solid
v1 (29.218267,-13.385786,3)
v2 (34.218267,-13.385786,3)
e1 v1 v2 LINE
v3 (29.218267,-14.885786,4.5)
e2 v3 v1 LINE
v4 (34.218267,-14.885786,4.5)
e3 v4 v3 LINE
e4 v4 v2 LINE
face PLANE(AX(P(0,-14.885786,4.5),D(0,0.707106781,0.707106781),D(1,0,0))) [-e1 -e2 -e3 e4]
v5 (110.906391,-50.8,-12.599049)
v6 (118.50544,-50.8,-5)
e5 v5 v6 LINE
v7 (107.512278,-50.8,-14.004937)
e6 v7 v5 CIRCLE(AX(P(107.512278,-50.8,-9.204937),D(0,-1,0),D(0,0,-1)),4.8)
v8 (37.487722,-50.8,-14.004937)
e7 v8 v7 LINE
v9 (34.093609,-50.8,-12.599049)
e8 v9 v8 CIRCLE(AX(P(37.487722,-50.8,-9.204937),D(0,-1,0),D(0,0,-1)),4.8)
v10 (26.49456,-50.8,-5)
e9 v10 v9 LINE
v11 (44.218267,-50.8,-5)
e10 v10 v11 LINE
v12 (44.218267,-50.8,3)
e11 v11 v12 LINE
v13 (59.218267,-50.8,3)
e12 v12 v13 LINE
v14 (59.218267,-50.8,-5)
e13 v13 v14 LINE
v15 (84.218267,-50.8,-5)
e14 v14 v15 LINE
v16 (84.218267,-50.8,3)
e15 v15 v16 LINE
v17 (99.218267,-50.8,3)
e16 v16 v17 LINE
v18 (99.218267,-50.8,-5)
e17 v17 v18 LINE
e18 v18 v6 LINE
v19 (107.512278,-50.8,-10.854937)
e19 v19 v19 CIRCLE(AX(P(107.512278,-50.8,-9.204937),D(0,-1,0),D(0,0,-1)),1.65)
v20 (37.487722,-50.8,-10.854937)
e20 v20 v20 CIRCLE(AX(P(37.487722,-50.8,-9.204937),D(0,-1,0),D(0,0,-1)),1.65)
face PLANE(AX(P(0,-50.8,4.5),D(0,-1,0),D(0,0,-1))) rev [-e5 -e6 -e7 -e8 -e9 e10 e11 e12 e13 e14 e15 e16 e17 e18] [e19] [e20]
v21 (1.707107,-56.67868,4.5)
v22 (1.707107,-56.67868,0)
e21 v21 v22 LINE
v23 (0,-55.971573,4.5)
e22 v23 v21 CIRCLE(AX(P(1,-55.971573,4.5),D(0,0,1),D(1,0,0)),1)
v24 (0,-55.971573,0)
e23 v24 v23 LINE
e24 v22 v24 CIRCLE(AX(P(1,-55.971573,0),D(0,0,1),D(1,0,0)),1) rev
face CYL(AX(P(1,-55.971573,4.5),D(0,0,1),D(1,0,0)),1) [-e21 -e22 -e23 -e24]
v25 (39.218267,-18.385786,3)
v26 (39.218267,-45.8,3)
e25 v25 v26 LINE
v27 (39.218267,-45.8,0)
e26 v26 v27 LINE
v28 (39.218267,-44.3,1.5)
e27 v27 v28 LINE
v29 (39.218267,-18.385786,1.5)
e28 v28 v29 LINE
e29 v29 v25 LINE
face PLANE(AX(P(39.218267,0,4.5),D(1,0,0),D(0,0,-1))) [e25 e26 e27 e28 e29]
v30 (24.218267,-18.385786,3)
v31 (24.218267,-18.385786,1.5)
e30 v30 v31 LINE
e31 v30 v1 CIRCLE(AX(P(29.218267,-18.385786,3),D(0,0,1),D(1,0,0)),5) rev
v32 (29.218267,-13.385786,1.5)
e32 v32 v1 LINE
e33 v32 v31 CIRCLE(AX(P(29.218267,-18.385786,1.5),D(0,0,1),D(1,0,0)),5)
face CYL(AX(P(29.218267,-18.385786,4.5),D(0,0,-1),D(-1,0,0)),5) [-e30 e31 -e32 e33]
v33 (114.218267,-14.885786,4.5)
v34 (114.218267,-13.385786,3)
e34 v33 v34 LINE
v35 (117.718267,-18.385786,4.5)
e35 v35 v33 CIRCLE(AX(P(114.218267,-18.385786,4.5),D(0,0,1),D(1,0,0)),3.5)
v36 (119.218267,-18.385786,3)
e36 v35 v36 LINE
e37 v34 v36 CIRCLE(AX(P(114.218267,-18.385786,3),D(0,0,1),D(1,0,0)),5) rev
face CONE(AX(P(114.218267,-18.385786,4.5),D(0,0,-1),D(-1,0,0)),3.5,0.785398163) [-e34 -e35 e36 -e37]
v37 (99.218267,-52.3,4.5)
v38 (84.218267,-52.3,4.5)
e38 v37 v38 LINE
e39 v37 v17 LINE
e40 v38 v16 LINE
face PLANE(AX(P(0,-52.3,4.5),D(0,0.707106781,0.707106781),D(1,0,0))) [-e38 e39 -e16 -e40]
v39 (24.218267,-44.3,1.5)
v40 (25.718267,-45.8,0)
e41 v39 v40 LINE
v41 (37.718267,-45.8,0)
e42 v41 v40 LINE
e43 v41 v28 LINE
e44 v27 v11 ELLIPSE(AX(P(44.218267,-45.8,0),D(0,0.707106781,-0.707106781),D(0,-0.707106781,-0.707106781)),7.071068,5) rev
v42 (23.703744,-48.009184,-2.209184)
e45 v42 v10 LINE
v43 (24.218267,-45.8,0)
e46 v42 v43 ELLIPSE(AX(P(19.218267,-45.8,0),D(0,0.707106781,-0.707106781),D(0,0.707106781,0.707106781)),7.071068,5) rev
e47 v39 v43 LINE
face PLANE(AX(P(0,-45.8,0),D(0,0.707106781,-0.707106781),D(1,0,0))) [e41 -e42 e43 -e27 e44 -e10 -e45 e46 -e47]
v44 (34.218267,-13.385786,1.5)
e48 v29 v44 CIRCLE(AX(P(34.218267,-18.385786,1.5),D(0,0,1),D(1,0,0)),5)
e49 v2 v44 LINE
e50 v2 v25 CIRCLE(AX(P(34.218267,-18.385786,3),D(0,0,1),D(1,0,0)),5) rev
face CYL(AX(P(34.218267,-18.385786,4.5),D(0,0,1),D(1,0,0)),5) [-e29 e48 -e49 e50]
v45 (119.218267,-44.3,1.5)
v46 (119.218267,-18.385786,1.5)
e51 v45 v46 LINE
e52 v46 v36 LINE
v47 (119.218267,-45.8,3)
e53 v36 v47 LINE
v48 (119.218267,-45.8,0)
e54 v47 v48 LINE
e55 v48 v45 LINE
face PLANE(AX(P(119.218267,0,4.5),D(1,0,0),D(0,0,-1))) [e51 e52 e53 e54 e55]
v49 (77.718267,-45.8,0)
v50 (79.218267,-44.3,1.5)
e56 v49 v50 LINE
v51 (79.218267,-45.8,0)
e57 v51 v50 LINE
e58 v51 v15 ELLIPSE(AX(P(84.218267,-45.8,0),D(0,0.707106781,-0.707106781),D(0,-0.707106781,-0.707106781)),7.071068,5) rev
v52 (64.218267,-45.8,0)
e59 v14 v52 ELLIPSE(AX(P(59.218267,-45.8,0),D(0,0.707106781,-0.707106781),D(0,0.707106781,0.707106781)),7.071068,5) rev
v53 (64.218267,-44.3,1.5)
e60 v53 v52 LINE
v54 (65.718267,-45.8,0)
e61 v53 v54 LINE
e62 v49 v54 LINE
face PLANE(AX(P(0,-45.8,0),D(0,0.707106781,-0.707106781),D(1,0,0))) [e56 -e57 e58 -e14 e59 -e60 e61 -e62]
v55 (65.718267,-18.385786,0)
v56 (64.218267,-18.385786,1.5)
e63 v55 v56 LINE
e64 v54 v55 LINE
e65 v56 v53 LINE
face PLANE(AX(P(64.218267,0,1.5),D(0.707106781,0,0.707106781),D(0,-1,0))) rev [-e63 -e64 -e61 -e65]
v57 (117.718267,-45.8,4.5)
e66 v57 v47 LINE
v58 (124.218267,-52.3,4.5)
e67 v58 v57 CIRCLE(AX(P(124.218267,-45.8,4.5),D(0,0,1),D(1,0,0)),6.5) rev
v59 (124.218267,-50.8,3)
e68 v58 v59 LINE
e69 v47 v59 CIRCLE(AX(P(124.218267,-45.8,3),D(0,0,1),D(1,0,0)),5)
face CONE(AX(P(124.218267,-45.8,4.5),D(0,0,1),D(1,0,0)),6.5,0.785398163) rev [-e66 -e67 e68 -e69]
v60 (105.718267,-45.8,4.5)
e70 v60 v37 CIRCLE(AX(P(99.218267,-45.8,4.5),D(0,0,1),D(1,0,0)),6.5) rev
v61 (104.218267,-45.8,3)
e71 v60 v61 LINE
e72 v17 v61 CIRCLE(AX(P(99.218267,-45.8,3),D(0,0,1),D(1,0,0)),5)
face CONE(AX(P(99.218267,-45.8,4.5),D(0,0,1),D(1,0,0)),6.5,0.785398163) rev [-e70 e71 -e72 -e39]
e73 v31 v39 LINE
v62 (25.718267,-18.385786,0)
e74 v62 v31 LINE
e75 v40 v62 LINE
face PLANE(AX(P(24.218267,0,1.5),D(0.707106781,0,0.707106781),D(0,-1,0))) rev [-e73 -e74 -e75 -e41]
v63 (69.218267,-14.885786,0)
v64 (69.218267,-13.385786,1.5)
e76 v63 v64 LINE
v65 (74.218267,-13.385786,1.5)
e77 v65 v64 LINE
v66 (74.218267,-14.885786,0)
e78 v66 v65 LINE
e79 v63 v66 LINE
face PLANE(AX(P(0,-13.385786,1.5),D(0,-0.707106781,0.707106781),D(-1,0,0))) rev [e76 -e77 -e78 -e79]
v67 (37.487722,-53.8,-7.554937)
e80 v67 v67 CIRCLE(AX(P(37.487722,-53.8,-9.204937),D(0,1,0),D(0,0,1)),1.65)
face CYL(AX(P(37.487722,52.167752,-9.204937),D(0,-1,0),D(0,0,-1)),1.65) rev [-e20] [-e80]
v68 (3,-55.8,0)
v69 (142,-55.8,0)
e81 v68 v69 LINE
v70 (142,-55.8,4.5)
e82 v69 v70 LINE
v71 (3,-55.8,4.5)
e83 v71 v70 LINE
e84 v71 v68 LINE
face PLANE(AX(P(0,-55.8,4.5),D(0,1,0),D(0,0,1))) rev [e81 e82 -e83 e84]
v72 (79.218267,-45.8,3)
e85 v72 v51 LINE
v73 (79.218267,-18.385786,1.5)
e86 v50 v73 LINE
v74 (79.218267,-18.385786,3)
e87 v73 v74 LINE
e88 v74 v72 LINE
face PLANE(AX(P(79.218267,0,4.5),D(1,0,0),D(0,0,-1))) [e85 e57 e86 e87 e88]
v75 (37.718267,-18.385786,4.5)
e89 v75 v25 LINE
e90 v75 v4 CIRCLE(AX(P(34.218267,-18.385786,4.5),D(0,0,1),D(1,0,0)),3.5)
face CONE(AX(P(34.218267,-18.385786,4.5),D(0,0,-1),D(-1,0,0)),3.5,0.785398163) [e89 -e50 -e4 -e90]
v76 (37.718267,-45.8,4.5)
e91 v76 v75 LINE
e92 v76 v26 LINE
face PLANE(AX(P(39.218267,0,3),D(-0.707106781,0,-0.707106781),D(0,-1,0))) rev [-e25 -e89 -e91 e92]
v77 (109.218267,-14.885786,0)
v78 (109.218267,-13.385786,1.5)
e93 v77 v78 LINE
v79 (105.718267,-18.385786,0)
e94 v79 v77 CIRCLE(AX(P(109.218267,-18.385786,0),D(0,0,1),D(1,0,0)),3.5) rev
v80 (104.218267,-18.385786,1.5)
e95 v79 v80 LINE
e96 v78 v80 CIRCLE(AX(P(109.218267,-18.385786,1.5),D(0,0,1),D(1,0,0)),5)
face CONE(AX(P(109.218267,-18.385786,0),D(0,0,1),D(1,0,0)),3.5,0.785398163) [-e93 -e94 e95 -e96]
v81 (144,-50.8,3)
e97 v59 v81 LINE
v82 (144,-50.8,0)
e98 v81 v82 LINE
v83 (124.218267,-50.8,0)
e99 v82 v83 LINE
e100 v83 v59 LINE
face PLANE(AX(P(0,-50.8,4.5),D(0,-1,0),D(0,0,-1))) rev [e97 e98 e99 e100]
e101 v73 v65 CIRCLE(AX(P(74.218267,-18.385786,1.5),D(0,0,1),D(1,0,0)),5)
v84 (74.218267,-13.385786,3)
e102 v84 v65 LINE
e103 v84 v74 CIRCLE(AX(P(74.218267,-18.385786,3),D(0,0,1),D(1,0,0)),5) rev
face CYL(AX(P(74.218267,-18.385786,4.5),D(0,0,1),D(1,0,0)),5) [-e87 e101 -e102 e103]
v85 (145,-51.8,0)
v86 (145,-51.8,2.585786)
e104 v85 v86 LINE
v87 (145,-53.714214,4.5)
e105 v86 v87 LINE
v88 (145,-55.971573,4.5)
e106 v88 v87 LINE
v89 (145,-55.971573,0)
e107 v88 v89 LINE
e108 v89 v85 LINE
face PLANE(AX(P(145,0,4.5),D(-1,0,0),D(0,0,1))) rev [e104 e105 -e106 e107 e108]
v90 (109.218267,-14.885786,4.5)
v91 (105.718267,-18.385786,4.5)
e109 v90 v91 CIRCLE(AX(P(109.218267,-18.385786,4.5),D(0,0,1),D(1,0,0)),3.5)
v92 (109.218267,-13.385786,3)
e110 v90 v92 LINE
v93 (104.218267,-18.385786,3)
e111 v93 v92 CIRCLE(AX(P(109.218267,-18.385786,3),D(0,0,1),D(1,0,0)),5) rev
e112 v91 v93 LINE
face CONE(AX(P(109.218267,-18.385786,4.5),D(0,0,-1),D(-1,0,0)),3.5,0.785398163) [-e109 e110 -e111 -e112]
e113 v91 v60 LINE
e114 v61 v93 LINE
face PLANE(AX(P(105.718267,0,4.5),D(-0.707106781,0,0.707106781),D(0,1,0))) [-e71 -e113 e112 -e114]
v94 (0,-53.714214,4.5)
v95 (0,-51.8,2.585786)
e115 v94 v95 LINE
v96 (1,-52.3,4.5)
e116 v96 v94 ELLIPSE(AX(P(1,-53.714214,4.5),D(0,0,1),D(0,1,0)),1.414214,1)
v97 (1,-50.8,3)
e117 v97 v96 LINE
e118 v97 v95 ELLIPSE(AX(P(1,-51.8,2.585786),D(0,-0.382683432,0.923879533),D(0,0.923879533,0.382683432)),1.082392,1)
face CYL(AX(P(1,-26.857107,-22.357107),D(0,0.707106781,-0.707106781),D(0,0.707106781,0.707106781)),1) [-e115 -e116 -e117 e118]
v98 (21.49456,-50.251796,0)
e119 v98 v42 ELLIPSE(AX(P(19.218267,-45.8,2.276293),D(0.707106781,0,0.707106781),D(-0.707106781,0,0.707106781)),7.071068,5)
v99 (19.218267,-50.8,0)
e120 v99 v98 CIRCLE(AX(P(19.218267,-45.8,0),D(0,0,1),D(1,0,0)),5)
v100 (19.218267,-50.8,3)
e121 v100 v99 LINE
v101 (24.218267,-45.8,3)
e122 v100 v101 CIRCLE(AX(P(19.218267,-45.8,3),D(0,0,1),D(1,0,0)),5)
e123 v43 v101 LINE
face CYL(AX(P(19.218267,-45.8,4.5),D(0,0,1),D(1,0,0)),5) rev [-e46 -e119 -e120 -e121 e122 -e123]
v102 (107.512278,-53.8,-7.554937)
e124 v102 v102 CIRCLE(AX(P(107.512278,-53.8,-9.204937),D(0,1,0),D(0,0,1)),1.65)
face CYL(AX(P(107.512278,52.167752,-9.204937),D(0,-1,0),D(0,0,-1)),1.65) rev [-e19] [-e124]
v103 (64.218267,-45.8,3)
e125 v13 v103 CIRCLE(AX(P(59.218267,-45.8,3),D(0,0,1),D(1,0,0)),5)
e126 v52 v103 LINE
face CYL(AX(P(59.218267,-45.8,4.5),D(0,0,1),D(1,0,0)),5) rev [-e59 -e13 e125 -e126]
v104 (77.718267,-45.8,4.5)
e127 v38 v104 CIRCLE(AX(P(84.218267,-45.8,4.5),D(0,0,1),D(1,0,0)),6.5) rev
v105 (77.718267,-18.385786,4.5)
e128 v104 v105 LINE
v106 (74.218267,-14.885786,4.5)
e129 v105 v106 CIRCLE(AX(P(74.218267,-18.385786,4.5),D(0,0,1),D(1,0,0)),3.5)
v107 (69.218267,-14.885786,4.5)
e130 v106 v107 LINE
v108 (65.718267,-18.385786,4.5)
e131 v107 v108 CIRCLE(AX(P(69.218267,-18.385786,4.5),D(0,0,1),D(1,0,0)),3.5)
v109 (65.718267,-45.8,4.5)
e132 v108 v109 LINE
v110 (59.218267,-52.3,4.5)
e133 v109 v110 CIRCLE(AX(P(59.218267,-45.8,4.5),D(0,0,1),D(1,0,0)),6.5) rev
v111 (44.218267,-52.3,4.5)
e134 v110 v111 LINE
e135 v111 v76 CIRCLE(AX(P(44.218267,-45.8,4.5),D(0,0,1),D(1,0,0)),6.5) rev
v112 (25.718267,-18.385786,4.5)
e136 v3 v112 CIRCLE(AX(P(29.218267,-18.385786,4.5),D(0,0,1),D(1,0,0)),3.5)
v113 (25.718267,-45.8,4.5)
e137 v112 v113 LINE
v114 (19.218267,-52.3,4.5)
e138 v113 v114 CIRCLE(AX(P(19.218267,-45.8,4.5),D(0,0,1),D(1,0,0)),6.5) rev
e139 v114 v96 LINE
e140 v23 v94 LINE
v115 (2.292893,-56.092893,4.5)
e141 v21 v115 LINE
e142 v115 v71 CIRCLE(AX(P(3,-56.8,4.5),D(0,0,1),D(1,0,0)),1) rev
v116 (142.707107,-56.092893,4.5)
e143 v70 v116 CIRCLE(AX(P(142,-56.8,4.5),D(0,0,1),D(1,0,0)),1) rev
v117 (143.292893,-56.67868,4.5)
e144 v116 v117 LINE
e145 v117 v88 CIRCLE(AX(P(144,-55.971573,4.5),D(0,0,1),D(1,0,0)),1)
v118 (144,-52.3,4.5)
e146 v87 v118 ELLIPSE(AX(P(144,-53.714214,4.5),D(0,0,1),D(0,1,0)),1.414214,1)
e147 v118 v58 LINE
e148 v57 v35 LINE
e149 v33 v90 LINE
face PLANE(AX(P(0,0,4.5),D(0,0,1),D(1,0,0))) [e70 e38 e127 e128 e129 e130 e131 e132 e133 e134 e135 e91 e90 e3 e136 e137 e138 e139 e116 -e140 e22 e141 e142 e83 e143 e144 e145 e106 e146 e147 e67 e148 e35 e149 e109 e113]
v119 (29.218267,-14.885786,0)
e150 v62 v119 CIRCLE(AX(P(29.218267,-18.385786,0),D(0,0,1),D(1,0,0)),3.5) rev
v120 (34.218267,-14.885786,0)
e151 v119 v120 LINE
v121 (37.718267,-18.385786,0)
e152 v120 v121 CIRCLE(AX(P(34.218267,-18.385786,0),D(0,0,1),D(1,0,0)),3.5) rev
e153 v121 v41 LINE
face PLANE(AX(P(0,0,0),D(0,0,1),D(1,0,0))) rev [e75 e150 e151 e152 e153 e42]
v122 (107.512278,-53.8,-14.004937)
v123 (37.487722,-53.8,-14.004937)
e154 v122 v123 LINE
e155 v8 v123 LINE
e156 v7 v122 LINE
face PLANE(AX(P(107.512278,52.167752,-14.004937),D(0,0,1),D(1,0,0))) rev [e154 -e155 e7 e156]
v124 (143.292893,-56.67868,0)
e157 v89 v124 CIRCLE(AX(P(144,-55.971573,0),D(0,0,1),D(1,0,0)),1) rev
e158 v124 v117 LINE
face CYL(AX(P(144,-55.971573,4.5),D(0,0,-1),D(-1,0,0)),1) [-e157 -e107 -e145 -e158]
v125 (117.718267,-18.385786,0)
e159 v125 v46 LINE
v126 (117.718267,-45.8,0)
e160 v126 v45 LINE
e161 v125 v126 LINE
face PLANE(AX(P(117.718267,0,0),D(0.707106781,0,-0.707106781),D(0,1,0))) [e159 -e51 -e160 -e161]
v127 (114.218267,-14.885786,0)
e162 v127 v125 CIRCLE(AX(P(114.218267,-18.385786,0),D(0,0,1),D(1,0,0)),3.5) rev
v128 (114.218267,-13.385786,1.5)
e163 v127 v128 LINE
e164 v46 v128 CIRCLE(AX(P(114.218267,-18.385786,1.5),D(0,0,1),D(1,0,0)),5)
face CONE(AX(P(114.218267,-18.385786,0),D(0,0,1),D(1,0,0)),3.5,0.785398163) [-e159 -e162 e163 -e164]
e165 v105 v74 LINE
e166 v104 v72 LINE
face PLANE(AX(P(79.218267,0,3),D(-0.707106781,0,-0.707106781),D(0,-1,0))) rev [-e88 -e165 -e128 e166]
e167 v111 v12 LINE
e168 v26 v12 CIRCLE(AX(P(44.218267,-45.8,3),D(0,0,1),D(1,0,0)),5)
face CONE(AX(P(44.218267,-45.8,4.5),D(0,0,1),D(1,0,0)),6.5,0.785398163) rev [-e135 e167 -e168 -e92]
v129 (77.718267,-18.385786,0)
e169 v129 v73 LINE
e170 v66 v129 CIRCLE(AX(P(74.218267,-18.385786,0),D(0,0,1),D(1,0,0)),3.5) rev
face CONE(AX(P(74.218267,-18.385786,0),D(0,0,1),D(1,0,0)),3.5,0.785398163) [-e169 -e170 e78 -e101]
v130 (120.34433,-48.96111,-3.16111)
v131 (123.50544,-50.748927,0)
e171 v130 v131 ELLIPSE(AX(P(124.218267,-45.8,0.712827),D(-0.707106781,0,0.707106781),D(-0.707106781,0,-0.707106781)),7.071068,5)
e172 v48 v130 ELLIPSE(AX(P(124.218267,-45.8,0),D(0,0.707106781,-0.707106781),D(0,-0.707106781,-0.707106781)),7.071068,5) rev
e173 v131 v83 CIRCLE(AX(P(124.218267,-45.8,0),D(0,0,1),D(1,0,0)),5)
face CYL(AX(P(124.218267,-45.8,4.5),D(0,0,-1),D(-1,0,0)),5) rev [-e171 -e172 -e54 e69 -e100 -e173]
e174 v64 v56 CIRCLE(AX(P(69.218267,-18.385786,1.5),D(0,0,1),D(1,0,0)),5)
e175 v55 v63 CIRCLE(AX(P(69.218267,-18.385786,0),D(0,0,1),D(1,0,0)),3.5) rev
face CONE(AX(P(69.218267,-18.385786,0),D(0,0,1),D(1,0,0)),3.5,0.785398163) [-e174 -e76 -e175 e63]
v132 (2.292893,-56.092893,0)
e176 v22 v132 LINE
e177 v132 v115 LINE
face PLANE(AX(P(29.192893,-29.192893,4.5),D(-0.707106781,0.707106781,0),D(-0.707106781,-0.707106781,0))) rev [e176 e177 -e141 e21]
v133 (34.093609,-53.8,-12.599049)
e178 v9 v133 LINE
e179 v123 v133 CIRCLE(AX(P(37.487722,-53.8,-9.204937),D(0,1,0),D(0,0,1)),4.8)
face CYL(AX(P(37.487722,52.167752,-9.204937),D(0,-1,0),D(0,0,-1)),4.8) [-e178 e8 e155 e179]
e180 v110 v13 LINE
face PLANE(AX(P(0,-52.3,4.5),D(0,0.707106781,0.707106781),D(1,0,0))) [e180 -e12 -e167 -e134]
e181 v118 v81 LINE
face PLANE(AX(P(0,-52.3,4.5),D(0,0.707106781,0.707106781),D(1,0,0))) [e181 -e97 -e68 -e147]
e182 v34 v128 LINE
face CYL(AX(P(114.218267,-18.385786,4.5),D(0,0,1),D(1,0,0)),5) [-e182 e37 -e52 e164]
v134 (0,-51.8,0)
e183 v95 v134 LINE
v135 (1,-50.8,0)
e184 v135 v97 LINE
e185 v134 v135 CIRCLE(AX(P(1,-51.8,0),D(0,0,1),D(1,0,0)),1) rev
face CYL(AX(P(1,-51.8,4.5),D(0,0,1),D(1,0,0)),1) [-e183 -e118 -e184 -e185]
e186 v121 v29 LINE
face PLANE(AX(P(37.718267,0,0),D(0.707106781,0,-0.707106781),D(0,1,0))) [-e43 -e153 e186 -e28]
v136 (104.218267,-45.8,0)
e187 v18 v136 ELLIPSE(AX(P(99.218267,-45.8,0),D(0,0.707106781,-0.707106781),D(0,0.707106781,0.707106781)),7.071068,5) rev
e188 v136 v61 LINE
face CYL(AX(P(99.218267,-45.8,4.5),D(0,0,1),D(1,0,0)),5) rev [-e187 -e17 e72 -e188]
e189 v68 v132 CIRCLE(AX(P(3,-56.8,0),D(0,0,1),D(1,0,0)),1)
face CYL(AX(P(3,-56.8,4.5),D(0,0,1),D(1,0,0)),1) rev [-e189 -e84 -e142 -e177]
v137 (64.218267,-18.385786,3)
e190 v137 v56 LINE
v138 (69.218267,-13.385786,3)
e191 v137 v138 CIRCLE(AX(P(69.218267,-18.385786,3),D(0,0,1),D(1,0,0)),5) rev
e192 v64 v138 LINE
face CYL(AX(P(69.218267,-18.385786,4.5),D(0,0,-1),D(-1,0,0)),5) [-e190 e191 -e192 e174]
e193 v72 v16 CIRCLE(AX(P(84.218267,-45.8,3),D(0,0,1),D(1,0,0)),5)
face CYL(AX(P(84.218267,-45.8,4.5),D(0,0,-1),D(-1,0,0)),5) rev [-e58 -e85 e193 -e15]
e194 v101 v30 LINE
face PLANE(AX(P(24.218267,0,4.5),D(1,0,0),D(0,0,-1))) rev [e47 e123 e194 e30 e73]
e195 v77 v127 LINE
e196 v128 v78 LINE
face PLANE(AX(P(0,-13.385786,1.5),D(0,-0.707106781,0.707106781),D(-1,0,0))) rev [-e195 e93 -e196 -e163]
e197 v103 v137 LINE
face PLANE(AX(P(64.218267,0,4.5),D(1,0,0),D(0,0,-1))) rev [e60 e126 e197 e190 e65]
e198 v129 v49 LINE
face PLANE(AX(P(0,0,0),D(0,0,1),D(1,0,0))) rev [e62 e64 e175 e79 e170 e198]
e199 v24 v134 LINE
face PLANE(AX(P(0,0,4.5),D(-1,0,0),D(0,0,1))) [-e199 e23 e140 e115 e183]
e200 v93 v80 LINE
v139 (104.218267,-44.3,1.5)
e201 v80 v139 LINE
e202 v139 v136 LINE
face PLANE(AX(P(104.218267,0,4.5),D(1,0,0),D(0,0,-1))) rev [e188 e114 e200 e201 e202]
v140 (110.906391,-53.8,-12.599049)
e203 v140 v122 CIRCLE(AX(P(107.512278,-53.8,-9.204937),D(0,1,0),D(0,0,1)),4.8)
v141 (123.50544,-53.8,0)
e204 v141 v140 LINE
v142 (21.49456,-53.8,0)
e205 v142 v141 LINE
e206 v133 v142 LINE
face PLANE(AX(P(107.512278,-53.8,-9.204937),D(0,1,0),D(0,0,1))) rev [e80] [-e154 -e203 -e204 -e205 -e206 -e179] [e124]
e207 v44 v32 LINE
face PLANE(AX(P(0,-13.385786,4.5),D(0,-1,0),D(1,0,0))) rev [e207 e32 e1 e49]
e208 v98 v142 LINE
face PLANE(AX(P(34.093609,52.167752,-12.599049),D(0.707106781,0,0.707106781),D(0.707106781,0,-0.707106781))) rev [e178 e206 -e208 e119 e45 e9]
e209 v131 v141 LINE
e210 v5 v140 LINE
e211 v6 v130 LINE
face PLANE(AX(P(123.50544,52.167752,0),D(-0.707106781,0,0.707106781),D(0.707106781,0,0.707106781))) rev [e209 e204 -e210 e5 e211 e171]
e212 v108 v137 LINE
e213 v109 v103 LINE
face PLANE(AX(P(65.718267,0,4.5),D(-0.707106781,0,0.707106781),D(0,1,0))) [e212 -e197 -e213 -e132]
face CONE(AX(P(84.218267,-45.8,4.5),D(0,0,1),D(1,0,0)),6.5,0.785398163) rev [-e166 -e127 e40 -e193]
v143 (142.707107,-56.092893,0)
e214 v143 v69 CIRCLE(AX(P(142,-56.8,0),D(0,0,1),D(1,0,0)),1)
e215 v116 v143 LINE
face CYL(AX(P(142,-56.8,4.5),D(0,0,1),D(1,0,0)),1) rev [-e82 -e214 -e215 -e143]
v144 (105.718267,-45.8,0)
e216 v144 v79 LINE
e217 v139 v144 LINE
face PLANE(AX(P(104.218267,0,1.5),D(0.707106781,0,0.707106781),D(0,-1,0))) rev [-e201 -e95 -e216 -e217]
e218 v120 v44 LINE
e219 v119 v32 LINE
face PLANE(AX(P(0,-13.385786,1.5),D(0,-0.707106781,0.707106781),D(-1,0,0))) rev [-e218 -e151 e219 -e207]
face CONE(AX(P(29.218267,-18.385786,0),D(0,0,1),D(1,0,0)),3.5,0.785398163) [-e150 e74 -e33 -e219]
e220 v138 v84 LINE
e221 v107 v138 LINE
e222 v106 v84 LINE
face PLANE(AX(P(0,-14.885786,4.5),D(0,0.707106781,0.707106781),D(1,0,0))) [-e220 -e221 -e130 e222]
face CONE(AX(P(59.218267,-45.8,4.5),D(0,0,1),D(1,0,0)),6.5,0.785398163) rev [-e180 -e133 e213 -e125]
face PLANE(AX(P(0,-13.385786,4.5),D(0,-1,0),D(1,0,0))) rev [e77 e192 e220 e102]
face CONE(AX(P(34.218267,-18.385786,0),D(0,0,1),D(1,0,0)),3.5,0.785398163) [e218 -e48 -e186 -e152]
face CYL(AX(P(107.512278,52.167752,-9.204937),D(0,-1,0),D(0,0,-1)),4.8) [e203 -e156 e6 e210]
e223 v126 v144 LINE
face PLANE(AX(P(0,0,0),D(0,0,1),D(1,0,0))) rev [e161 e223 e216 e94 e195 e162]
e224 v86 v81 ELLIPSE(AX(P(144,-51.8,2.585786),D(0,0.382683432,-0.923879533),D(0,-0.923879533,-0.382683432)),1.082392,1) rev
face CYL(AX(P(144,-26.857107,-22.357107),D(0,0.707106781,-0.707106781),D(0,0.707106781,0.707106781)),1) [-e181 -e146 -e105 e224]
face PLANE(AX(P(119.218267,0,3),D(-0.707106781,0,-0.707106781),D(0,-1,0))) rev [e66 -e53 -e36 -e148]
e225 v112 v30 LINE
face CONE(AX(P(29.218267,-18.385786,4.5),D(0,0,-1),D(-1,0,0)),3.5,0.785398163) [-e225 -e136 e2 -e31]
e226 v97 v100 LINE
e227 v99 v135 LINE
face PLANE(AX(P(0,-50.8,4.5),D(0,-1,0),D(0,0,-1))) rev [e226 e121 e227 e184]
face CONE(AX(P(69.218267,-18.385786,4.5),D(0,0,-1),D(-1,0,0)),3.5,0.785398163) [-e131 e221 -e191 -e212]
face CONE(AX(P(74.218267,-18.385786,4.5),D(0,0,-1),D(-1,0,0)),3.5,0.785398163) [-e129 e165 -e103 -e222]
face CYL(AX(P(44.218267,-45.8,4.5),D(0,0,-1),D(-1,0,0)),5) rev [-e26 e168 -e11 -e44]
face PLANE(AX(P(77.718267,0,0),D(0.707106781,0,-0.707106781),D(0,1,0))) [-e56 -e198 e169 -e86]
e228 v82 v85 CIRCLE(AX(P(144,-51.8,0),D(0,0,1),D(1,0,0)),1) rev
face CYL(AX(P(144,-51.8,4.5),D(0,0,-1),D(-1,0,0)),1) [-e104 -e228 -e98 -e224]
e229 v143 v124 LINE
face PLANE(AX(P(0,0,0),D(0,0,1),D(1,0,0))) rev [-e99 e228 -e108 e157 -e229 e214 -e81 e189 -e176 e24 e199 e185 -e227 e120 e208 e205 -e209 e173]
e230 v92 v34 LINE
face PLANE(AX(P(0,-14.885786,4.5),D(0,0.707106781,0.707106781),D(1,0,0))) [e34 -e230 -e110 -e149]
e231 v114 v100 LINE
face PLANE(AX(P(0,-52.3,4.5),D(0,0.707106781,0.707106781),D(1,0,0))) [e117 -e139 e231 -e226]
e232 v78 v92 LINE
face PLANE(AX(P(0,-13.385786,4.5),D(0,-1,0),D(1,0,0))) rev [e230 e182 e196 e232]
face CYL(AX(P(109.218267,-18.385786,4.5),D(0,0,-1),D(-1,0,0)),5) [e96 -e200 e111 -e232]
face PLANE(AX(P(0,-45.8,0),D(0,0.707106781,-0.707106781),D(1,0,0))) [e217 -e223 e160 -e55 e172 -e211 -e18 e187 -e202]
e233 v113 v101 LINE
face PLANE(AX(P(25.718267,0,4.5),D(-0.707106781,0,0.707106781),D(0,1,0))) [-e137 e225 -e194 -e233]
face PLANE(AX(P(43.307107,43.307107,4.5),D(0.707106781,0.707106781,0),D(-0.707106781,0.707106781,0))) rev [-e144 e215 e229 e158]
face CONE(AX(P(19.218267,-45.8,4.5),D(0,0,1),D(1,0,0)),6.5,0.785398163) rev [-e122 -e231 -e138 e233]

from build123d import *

# Parameters (mm, degrees)
BOSS_EXTRUDE1_DEPTH = 4.5
SKETCH2_R           = 1.6500000000000021
BOSS_EXTRUDE2_DEPTH = 3
CHAMFER1_SIZE       = 5
FILLET1_R           = 5
FILLET2_R           = 5
CHAMFER2_SIZE       = 1.5
CHAMFER3_SIZE       = 1.5
FILLET3_R           = 1


with BuildPart() as part:
    # Sketch1 → Boss-Extrude1 (new body)
    with BuildSketch(Plane.XY):
        Polygon((119.21826692136499, -13.385786437626857), (104.21826692136499, -13.38578643762686), (104.21826692136499, -50.8), (79.218266921365, -50.8), (79.218266921365, -13.385786437626857), (64.218266921365, -13.38578643762686), (64.218266921365, -50.8), (39.218266921365, -50.8), (39.21826692136499, -13.385786437627136), (24.218266921364993, -13.38578643762714), (24.21826692136499, -50.8), (0, -50.79999999999999), (0, -58.38578643762687), (2.5857864376269135, -55.8), (142.4142135623731, -55.8), (145, -58.38578643762691), (145, -50.8), (119.21826692136499, -50.8), align=None)
    extrude(amount=BOSS_EXTRUDE1_DEPTH)

    # Sketch2 → Boss-Extrude2 (add)
    with BuildSketch(Plane(origin=(0, -53.8, 0), x_dir=(1, 0, 0), z_dir=(0, 1, 0))):
        with BuildLine():
            Line((123.50544023729859, 2.968e-14), (110.90639087969068, 12.59904935760797))
            ThreePointArc((110.90639087969068, 12.59904935760797), (109.34915880534766, 13.639558563966734), (107.5122783299952, 14.004936807912568))
            Line((107.5122783299952, 14.004936807912568), (37.48772167000479, 14.004936807912571))
            ThreePointArc((37.48772167000479, 14.004936807912571), (35.65084119465232, 13.639558563966755), (34.093609120309296, 12.599049357607985))
            Line((34.093609120309296, 12.599049357607985), (21.4945597627013, -1.69e-15))
            Line((21.4945597627013, -1.69e-15), (123.50544023729859, 2.968e-14))
        make_face()
        with Locations(Location((37.48772167000473, 9.204936807912581, 0), (0, 0, 90))):
            Circle(SKETCH2_R, mode=Mode.SUBTRACT)
        with Locations(Location((107.51227832999525, 9.204936807912581, 0), (0, 0, 90))):
            Circle(SKETCH2_R, mode=Mode.SUBTRACT)
    extrude(amount=BOSS_EXTRUDE2_DEPTH)

    # Chamfer1
    # the kernel refuses this chamfer: 5 mm, written as the material it adds along each edge
    with BuildSketch(Plane(origin=(24.218266921364993, -50.8, 8.6e-16), x_dir=(0, -0.02749587661059184, -0.9996219169112965), z_dir=(1, 0, -3.1e-16))) as chamfer1_piece_1_section:
        Polygon((CHAMFER1_SIZE * 0.999621916911, CHAMFER1_SIZE * 0.0274958766106), (-CHAMFER1_SIZE * 0.0274958766106, CHAMFER1_SIZE * 0.999621916911), (0, 0), align=None)
    chamfer1_piece_1 = extrude(amount=15.000000000000007, mode=Mode.PRIVATE)
    chamfer1_piece_1 = split(chamfer1_piece_1, bisect_by=Plane(origin=(27.458586857581327, -49.136179349739656, -5.964027094880023), z_dir=(0.7071067811865472, 0, 0.7071067811865478)), keep=Keep.TOP, mode=Mode.PRIVATE)
    add(chamfer1_piece_1)
    with BuildSketch(Plane(origin=(64.218266921365, -50.8, -1.145e-14), x_dir=(0, -0.02749587661058908, -0.9996219169112968), z_dir=(1, 0, -3.1e-16))) as chamfer1_piece_2:
        Polygon((CHAMFER1_SIZE * 0.999621916911, CHAMFER1_SIZE * 0.0274958766106), (-CHAMFER1_SIZE * 0.0274958766106, CHAMFER1_SIZE * 0.999621916911), (0, 0), align=None)
    extrude(amount=15)
    with BuildSketch(Plane(origin=(104.21826692136499, -50.8, -2.375e-14), x_dir=(0, 0.9996219169112965, 0.027495876610591035), z_dir=(1, 0, -3.1e-16))) as chamfer1_piece_3_section:
        Polygon((CHAMFER1_SIZE * 0.999621916911, -CHAMFER1_SIZE * 0.0274958766106), (-CHAMFER1_SIZE * 0.0274958766106, -CHAMFER1_SIZE * 0.999621916911), (0, 0), align=None)
    chamfer1_piece_3 = extrude(amount=15, mode=Mode.PRIVATE)
    chamfer1_piece_3 = split(chamfer1_piece_3, bisect_by=Plane(origin=(116.78603436653776, -49.14998540496001, -6.719405870760873), z_dir=(-0.7071067811865483, 0, 0.7071067811865467)), keep=Keep.TOP, mode=Mode.PRIVATE)
    add(chamfer1_piece_3)

    # Fillet1
    fillet1_edges = [part.edges().sort_by_distance(p)[0] for p in [
        (39.218266921365, -50.80000000000099, -0.24999999999926015),
        (64.218266921365, -50.80000000000099, -0.24999999999926015),
        (79.218266921365, -50.80000000000099, -0.24999999999926015),
        (104.218266921365, -50.799999999999, -0.24999999999926015),
        (119.21826692136499, -50.799999999999145, 0.10641334203299913),
        (24.218266921364997, -50.80000000000054, 0.8881464206679999),
    ]]
    fillet(fillet1_edges, radius=FILLET1_R)

    # Fillet2
    fillet2_edges = [part.edges().sort_by_distance(p)[0] for p in [
        (24.218266921364993, -13.38578643762714, 2.25),
        (39.21826692136499, -13.385786437627136, 2.25),
        (64.218266921365, -13.38578643762686, 2.25),
        (79.218266921365, -13.385786437626857, 2.25),
        (104.21826692136499, -13.38578643762686, 2.25),
        (119.21826692136499, -13.385786437626855, 2.25),
    ]]
    fillet(fillet2_edges, radius=FILLET2_R)

    # Chamfer2
    # the kernel refuses this chamfer: 1.5 mm, written as the material it takes off along each edge
    with BuildSketch(Plane(origin=(114.218266921365, -13.385786437626859, 0), x_dir=(0, -0.9996219169112968, -0.02749587661058636), z_dir=(-1, -2.4e-16, 0))) as chamfer2_piece_1:
        Polygon((CHAMFER2_SIZE * 0.999621916911, CHAMFER2_SIZE * 0.0274958766106), (-CHAMFER2_SIZE * 0.0274958766106, CHAMFER2_SIZE * 0.999621916911), (0, 0), align=None)
    extrude(amount=5, mode=Mode.SUBTRACT)
    with BuildSketch(Plane(origin=(119.218266921365, -49.65752448195035, 0), x_dir=(0.02749587661058217, 0, 0.9996219169112969), z_dir=(0, 1, 0))) as chamfer2_piece_2_section:
        Polygon((CHAMFER2_SIZE * 0.999621916911, -CHAMFER2_SIZE * 0.0274958766106), (-CHAMFER2_SIZE * 0.0274958766106, -CHAMFER2_SIZE * 0.999621916911), (0, 0), align=None)
    chamfer2_piece_2 = extrude(amount=31.27173804432349, mode=Mode.PRIVATE)
    chamfer2_piece_2 = split(chamfer2_piece_2, bisect_by=Plane(origin=(118.72073896252428, -38.57940955340098, 7.220590446608273), z_dir=(0, 0.7071067811868302, -0.7071067811862648)), keep=Keep.TOP, mode=Mode.PRIVATE)
    add(chamfer2_piece_2, mode=Mode.SUBTRACT)
    with BuildSketch(Plane(origin=(104.21826692136499, -18.38578643762686, 0), x_dir=(0.9996219169112968, 0, -0.02749587661058662), z_dir=(0, -1, 0))) as chamfer2_piece_3_section:
        Polygon((CHAMFER2_SIZE * 0.999621916911, CHAMFER2_SIZE * 0.0274958766106), (-CHAMFER2_SIZE * 0.0274958766106, CHAMFER2_SIZE * 0.999621916911), (0, 0), align=None)
    chamfer2_piece_3 = extrude(amount=31.27173804432348, mode=Mode.PRIVATE)
    chamfer2_piece_3 = split(chamfer2_piece_3, bisect_by=Plane(origin=(104.71579488020573, -38.579409553400986, 7.220590446608265), z_dir=(0, 0.7071067811868302, -0.7071067811862648)), keep=Keep.TOP, mode=Mode.PRIVATE)
    add(chamfer2_piece_3, mode=Mode.SUBTRACT)
    with BuildSketch(Plane(origin=(109.218266921365, -18.385786437626862, 0), x_dir=(0, 1, 0), z_dir=(1, 0, 0))) as chamfer2_piece_4:
        Polygon((5 - CHAMFER2_SIZE, 0), (5, CHAMFER2_SIZE), (5, 0), align=None)
    revolve(axis=Axis((109.218266921365, -18.385786437626862, 0), (0, 0, 1)), revolution_arc=90, mode=Mode.SUBTRACT)
    with BuildSketch(Plane(origin=(114.218266921365, -18.385786437626855, 0), x_dir=(1, 0, 0), z_dir=(0, -1, 0))) as chamfer2_piece_5:
        Polygon((5, CHAMFER2_SIZE), (5 - CHAMFER2_SIZE, 0), (5, 0), align=None)
    revolve(axis=Axis((114.218266921365, -18.385786437626855, 0), (0, 0, 1)), revolution_arc=90, mode=Mode.SUBTRACT)
    with BuildSketch(Plane(origin=(74.218266921365, -13.385786437626859, 0), x_dir=(0, 0.027495876610586778, 0.9996219169112968), z_dir=(-1, -2.4e-16, 0))) as chamfer2_piece_6:
        Polygon((CHAMFER2_SIZE * 0.999621916911, -CHAMFER2_SIZE * 0.0274958766106), (-CHAMFER2_SIZE * 0.0274958766106, -CHAMFER2_SIZE * 0.999621916911), (0, 0), align=None)
    extrude(amount=5, mode=Mode.SUBTRACT)
    with BuildSketch(Plane(origin=(79.218266921365, -49.65752448195035, 0), x_dir=(0.027495876610582157, 0, 0.9996219169112969), z_dir=(0, 1, 0))) as chamfer2_piece_7_section:
        Polygon((CHAMFER2_SIZE * 0.999621916911, -CHAMFER2_SIZE * 0.0274958766106), (-CHAMFER2_SIZE * 0.0274958766106, -CHAMFER2_SIZE * 0.999621916911), (0, 0), align=None)
    chamfer2_piece_7 = extrude(amount=31.27173804432349, mode=Mode.PRIVATE)
    chamfer2_piece_7 = split(chamfer2_piece_7, bisect_by=Plane(origin=(78.72073896252427, -38.579409553386625, 7.220590446607076), z_dir=(0, 0.7071067811862648, -0.7071067811868302)), keep=Keep.TOP, mode=Mode.PRIVATE)
    add(chamfer2_piece_7, mode=Mode.SUBTRACT)
    with BuildSketch(Plane(origin=(64.218266921365, -18.38578643762686, 0), x_dir=(-0.02749587661058215, 0, 0.9996219169112969), z_dir=(0, -1, 0))) as chamfer2_piece_8_section:
        Polygon((CHAMFER2_SIZE * 0.999621916911, -CHAMFER2_SIZE * 0.0274958766106), (-CHAMFER2_SIZE * 0.0274958766106, -CHAMFER2_SIZE * 0.999621916911), (0, 0), align=None)
    chamfer2_piece_8 = extrude(amount=31.27173804432348, mode=Mode.PRIVATE)
    chamfer2_piece_8 = split(chamfer2_piece_8, bisect_by=Plane(origin=(64.71579488020572, -38.57940955338663, 7.220590446607069), z_dir=(0, 0.7071067811862648, -0.7071067811868302)), keep=Keep.TOP, mode=Mode.PRIVATE)
    add(chamfer2_piece_8, mode=Mode.SUBTRACT)
    with BuildSketch(Plane(origin=(69.218266921365, -18.385786437626862, 0), x_dir=(-1, 0, 0), z_dir=(0, -1, 0))) as chamfer2_piece_9:
        Polygon((5, -CHAMFER2_SIZE), (5 - CHAMFER2_SIZE, 0), (5, 0), align=None)
    revolve(axis=Axis((69.218266921365, -18.385786437626862, 0), (0, 0, -1)), revolution_arc=90, mode=Mode.SUBTRACT)
    with BuildSketch(Plane(origin=(74.218266921365, -18.385786437626855, 0), x_dir=(0, 1, 0), z_dir=(-1, 0, 0))) as chamfer2_piece_10:
        Polygon((5, -CHAMFER2_SIZE), (5 - CHAMFER2_SIZE, 0), (5, 0), align=None)
    revolve(axis=Axis((74.218266921365, -18.385786437626855, 0), (0, 0, -1)), revolution_arc=90, mode=Mode.SUBTRACT)
    with BuildSketch(Plane(origin=(34.218266921365, -13.385786437627138, 0), x_dir=(0, 0.027495876610586778, 0.9996219169112968), z_dir=(-1, -2.4e-16, 0))) as chamfer2_piece_11:
        Polygon((CHAMFER2_SIZE * 0.999621916911, -CHAMFER2_SIZE * 0.0274958766106), (-CHAMFER2_SIZE * 0.0274958766106, -CHAMFER2_SIZE * 0.999621916911), (0, 0), align=None)
    extrude(amount=5, mode=Mode.SUBTRACT)
    with BuildSketch(Plane(origin=(39.218266921365, -49.65752448195034, 0), x_dir=(0.027495876610586757, 0, 0.9996219169112968), z_dir=(0, 1, 0))) as chamfer2_piece_12_section:
        Polygon((CHAMFER2_SIZE * 0.999621916911, -CHAMFER2_SIZE * 0.0274958766106), (-CHAMFER2_SIZE * 0.0274958766106, -CHAMFER2_SIZE * 0.999621916911), (0, 0), align=None)
    chamfer2_piece_12 = extrude(amount=31.2717380443232, mode=Mode.PRIVATE)
    chamfer2_piece_12 = split(chamfer2_piece_12, bisect_by=Plane(origin=(38.72073896252428, -38.579409553386704, 7.220590446606996), z_dir=(0, 0.7071067811862648, -0.7071067811868302)), keep=Keep.TOP, mode=Mode.PRIVATE)
    add(chamfer2_piece_12, mode=Mode.SUBTRACT)
    with BuildSketch(Plane(origin=(24.218266921364993, -18.38578643762714, 0), x_dir=(-0.027495876610582153, 0, 0.9996219169112969), z_dir=(-9e-17, -1, 0))) as chamfer2_piece_13_section:
        Polygon((CHAMFER2_SIZE * 0.999621916911, -CHAMFER2_SIZE * 0.0274958766106), (-CHAMFER2_SIZE * 0.0274958766106, -CHAMFER2_SIZE * 0.999621916911), (0, 0), align=None)
    chamfer2_piece_13 = extrude(amount=31.271738044323207, mode=Mode.PRIVATE)
    chamfer2_piece_13 = split(chamfer2_piece_13, bisect_by=Plane(origin=(24.71579488020572, -38.57940955338671, 7.220590446606995), z_dir=(0, 0.7071067811862648, -0.7071067811868302)), keep=Keep.TOP, mode=Mode.PRIVATE)
    add(chamfer2_piece_13, mode=Mode.SUBTRACT)
    with BuildSketch(Plane(origin=(29.218266921365, -18.38578643762714, 0), x_dir=(-1, 0, 0), z_dir=(0, -1, 0))) as chamfer2_piece_14:
        Polygon((5, -CHAMFER2_SIZE), (5 - CHAMFER2_SIZE, 0), (5, 0), align=None)
    revolve(axis=Axis((29.218266921365, -18.38578643762714, 0), (0, 0, -1)), revolution_arc=90, mode=Mode.SUBTRACT)
    with BuildSketch(Plane(origin=(34.218266921365, -18.38578643762714, 0), x_dir=(0, 1, 0), z_dir=(-1, 0, 0))) as chamfer2_piece_15:
        Polygon((5, -CHAMFER2_SIZE), (5 - CHAMFER2_SIZE, 0), (5, 0), align=None)
    revolve(axis=Axis((34.218266921365, -18.38578643762714, 0), (0, 0, -1)), revolution_arc=90, mode=Mode.SUBTRACT)

    # Chamfer3
    chamfer3_edges = [part.edges().sort_by_distance(p)[0] for p in [
        (51.718266921365, -50.8, 4.5),
        (9.609133460682495, -50.79999999999999, 4.5),
        (40.68273301543226, -49.335533905932756, 4.500000000000743),
        (22.75380082729773, -49.335533905931676, 4.500000000000536),
        (62.75380082729774, -49.33553390593275, 4.500000000000743),
        (80.68273301543226, -49.33553390593075, 4.500000000000743),
        (120.68273301543226, -49.335533905932735, 4.4999999999993054),
        (102.75380082729772, -49.33553390593474, 4.499999999999262),
        (111.718266921365, -13.385786437626859, 4.5),
        (119.21826692136499, -32.09289321881342, 4.5),
        (24.218266921364993, -32.09289321881304, 4.5),
        (104.21826692136499, -32.09289321881443, 4.5),
        (79.218266921365, -32.092893218812435, 4.5),
        (71.718266921365, -13.385786437626859, 4.5),
        (64.218266921365, -32.09289321881344, 4.5),
        (39.21826692136499, -32.09289321881358, 4.5),
        (31.718266921365, -13.385786437627138, 4.5),
        (25.682733015432262, -14.850252531694402, 4.5),
        (37.75380082729774, -14.850252531694402, 4.5),
        (65.68273301543226, -14.850252531694125, 4.5),
        (77.75380082729774, -14.850252531694117, 4.5),
        (105.68273301543226, -14.850252531694125, 4.5),
        (117.75380082729774, -14.850252531694117, 4.5),
        (134.6091334606825, -50.79999999999999, 4.5),
    ]]
    chamfer(chamfer3_edges, length=CHAMFER3_SIZE)

    # Fillet3
    fillet3_edges = [part.edges().sort_by_distance(p)[0] for p in [
        (145, -58.38578643762691, 2.25),
        (142.4142135623731, -55.8, 2.25),
        (2.5857864376269135, -55.8, 2.25),
        (0, -58.38578643762687, 2.25),
        (0, -50.8, 1.4999999999999982),
        (-1.78e-15, -51.55000000000001, 3.749999999999994),
        (145, -50.8, 1.4999999999999996),
        (145, -51.54999999999999, 3.749999999999999),
    ]]
    fillet(fillet3_edges, radius=FILLET3_R)


solid = part.part
